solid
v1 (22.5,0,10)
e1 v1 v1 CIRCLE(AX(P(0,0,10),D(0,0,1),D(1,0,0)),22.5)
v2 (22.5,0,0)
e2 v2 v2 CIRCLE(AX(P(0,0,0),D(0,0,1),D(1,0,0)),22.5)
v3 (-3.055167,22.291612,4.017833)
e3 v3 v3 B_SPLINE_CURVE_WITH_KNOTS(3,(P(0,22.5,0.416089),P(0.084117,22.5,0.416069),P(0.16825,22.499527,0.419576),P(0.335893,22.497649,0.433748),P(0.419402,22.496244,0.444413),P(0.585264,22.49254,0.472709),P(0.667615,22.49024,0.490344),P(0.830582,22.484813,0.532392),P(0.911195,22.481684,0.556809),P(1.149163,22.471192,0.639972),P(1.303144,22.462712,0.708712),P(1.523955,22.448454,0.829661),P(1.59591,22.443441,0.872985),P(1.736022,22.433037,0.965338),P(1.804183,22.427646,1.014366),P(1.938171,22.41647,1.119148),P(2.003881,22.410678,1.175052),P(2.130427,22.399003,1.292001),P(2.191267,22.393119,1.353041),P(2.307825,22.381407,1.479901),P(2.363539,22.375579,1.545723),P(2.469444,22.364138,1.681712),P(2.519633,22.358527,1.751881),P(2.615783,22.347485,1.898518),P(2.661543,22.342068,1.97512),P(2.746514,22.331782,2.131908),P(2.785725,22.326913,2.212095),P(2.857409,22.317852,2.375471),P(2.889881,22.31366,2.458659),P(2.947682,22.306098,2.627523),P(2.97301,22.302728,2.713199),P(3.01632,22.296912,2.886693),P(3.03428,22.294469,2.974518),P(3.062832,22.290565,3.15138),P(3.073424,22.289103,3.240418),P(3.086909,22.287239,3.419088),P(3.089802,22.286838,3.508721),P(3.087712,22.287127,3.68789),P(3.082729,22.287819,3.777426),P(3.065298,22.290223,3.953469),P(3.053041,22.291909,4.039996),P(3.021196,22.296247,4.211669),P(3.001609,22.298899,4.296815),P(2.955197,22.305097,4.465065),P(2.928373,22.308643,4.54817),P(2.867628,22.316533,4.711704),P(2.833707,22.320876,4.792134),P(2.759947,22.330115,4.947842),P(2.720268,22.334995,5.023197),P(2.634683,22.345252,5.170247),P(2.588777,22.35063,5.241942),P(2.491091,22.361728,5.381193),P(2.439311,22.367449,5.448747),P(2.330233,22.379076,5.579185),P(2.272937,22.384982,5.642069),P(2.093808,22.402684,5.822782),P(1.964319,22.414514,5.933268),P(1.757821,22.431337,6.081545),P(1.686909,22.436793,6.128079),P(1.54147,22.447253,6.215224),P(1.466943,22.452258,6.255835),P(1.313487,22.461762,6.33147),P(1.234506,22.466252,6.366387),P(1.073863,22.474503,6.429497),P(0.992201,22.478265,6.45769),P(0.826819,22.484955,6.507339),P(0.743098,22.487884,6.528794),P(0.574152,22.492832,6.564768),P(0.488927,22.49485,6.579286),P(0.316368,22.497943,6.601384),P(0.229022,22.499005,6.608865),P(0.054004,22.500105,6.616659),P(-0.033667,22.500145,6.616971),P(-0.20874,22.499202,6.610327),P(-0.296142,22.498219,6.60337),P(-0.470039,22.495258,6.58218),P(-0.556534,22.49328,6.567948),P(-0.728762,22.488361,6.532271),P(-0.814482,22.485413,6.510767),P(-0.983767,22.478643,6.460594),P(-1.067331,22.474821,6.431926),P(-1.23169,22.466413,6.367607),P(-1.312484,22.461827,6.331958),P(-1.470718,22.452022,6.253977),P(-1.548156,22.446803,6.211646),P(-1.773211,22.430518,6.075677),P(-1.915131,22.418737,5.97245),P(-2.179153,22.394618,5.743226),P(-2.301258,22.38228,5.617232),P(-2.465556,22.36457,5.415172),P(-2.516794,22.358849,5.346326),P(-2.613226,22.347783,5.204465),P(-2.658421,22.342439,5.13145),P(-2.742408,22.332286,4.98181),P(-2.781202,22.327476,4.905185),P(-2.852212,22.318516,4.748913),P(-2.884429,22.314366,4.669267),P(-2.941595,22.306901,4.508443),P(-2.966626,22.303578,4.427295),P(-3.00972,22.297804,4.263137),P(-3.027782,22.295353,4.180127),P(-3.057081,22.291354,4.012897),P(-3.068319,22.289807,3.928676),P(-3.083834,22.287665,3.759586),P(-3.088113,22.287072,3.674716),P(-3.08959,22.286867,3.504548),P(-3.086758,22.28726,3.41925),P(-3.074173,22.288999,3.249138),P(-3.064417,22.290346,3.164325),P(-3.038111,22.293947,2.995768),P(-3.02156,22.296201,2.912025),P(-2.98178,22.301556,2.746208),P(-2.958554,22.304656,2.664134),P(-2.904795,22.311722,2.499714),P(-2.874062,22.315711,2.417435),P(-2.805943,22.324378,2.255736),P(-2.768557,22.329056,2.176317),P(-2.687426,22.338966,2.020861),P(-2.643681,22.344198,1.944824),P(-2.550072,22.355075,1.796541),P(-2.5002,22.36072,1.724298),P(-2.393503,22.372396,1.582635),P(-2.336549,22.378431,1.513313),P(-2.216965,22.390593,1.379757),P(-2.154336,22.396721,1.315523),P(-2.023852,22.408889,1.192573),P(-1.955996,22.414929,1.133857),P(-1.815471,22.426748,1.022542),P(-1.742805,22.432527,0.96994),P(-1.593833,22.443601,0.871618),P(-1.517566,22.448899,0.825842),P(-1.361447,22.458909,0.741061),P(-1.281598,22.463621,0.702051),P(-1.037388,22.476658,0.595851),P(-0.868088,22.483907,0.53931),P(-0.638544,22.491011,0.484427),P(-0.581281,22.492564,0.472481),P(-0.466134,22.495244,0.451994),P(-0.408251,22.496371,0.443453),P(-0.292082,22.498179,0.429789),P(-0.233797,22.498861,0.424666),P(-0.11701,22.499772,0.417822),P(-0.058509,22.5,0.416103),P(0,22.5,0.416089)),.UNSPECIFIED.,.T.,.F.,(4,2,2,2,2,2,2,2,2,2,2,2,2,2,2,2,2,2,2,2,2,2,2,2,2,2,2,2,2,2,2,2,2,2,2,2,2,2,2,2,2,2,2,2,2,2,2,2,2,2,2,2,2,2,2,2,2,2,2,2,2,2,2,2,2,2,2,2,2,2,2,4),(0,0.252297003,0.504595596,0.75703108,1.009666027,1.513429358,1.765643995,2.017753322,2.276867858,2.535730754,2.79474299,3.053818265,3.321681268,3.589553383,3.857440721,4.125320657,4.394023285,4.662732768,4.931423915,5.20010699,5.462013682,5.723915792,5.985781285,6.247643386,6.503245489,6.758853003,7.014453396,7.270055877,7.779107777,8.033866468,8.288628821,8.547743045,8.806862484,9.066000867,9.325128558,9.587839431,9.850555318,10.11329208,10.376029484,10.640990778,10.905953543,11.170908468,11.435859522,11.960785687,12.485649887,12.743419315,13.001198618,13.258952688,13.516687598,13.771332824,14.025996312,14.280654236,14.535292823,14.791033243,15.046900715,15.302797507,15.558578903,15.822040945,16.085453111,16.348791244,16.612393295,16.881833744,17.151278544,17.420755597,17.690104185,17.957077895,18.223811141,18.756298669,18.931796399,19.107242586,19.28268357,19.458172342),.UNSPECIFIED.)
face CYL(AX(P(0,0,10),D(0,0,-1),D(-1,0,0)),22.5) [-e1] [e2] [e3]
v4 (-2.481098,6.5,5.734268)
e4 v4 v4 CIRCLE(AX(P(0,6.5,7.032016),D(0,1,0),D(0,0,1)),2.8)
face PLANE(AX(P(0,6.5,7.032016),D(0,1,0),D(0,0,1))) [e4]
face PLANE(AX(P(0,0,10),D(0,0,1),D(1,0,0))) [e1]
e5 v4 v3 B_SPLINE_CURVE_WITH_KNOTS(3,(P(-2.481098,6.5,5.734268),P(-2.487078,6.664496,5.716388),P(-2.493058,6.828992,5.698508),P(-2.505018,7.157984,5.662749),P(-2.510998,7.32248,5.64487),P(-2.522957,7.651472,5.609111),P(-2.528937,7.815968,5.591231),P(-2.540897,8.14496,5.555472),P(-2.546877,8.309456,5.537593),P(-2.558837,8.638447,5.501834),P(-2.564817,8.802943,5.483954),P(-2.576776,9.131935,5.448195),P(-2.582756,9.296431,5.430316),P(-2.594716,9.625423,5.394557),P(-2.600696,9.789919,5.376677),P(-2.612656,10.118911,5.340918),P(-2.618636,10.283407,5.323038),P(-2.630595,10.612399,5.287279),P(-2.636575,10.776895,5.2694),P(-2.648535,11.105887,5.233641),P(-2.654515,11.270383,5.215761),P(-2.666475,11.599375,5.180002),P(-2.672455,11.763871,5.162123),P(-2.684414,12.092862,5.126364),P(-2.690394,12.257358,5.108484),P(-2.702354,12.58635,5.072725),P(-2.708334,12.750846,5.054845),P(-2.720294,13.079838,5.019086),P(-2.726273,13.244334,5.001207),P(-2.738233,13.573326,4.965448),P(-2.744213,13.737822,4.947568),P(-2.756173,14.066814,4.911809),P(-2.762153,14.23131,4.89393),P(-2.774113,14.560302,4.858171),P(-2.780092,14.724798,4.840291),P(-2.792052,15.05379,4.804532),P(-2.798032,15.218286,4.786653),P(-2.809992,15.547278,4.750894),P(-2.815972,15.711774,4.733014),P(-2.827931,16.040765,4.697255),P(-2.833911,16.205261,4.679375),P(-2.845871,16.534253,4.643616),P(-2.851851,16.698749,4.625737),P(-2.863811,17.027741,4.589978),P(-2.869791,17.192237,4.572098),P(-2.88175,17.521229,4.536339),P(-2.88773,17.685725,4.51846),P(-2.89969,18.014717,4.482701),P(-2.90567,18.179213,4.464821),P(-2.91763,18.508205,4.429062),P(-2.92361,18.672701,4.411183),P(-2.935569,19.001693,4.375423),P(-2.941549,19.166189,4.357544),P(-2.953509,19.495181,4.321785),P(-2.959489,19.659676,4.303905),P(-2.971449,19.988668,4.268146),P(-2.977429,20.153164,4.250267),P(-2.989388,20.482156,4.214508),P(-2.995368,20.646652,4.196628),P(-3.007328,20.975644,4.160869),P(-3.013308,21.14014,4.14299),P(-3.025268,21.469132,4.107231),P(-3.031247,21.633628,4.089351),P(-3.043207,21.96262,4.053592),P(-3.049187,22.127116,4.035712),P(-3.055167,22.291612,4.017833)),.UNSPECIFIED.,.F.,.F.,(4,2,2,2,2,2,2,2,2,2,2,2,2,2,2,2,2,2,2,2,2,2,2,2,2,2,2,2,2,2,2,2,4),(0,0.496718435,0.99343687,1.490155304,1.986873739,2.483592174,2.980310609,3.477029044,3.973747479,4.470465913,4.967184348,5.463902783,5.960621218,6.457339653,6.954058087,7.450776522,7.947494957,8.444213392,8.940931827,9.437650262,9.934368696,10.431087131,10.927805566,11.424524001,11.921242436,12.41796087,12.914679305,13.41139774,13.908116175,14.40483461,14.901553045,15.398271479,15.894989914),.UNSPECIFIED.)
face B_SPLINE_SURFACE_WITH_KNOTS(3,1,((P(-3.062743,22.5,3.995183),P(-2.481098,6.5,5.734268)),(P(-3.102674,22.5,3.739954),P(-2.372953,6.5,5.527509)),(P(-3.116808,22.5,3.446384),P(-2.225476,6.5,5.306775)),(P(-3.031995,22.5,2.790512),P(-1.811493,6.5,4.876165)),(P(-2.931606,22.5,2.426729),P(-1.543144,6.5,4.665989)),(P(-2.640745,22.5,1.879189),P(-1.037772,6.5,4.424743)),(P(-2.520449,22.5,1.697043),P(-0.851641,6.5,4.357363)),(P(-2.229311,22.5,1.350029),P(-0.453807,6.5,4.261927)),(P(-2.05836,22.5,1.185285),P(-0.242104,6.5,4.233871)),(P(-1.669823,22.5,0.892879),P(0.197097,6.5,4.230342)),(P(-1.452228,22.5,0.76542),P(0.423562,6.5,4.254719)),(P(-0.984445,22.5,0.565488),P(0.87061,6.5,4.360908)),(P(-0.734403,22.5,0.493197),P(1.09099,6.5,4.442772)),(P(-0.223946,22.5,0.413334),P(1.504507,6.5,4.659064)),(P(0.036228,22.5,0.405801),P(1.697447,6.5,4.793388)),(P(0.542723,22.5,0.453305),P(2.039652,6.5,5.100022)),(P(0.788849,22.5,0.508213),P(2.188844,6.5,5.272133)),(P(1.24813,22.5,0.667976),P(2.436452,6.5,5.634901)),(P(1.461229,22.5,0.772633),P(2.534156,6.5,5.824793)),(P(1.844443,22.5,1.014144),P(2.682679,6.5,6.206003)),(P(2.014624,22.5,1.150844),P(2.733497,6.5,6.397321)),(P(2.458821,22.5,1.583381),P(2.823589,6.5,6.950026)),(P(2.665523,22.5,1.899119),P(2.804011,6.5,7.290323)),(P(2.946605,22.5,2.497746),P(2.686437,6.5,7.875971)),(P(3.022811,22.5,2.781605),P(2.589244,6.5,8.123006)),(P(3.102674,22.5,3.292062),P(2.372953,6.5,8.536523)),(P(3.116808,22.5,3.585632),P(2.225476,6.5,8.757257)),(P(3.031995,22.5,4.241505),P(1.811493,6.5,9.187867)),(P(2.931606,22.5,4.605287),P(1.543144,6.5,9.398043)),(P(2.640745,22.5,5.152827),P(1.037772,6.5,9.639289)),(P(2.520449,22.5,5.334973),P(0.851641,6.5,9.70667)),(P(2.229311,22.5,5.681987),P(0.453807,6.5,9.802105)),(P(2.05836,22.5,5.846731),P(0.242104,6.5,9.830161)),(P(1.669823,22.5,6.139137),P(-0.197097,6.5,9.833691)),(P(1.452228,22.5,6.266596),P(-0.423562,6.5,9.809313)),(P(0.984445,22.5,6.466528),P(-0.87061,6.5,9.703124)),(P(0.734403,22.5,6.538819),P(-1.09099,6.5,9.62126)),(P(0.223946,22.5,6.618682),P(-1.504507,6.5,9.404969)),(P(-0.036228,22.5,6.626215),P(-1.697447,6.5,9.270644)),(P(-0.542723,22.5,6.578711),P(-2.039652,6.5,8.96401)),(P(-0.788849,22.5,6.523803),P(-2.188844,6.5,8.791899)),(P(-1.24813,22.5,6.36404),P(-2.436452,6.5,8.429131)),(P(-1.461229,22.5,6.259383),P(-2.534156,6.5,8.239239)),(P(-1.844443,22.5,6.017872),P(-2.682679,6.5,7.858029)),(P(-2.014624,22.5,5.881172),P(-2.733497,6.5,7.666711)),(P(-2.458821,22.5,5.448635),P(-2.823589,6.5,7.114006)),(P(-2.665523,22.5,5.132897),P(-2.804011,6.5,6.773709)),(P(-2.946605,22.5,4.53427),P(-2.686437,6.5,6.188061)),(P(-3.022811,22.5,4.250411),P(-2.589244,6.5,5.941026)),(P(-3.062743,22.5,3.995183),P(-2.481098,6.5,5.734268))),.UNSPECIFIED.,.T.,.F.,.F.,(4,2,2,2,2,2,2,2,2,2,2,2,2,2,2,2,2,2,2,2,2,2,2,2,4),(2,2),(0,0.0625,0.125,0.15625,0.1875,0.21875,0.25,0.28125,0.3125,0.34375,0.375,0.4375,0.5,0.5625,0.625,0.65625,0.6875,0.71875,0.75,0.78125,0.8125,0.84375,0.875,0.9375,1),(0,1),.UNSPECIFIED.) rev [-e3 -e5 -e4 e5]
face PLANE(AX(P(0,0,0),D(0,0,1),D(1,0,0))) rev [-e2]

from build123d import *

# Parameters (mm, degrees)
SKETCH1_R           = 22.5
BOSS_EXTRUDE1_DEPTH = 10


with BuildPart() as part:
    # Sketch1 → Boss-Extrude1 (new body)
    with BuildSketch(Plane(origin=(0, 0, 0), x_dir=(0, 1, 0), z_dir=(0, 0, 1))):
        with Locations(Location((0, 0, 0), (0, 0, 270))):
            Circle(SKETCH1_R)
    extrude(amount=BOSS_EXTRUDE1_DEPTH)

    # Cut-Loft2: read off the stored shape, not the designer's step
    # Cut-Loft2: loft between two sections, ruled curve by curve
    cut_loft2_from = [
        Edge.make_bspline([(-3.062742519, 22.5, 3.995182606), (-3.102673733, 22.5, 3.739954063), (-3.116808131, 22.5, 3.446383899), (-3.031995261, 22.5, 2.790511537), (-2.931606201, 22.5, 2.426728682), (-2.640745029, 22.5, 1.879188932), (-2.52044876, 22.5, 1.697043211), (-2.229311291, 22.5, 1.350028778), (-2.058360385, 22.5, 1.185285355), (-1.669822979, 22.5, 0.892878816), (-1.45222816, 22.5, 0.765420496), (-0.984445001, 22.5, 0.565488339), (-0.734403106, 22.5, 0.493196738), (-0.223946019, 22.5, 0.413334311), (0.036227535, 22.5, 0.405801289), (0.542722706, 22.5, 0.453304899), (0.788849216, 22.5, 0.508212731), (1.248129809, 22.5, 0.667975792), (1.461229266, 22.5, 0.772633471), (1.844443062, 22.5, 1.014143778), (2.0146236, 22.5, 1.150843597), (2.458820633, 22.5, 1.583381452), (2.665522556, 22.5, 1.899119071), (2.946605326, 22.5, 2.497746045), (3.022811306, 22.5, 2.781604937), (3.102673733, 22.5, 3.292062024), (3.116808131, 22.5, 3.585632188), (3.031995261, 22.5, 4.241504549), (2.931606201, 22.5, 4.605287404), (2.640745029, 22.5, 5.152827155), (2.52044876, 22.5, 5.334972875), (2.229311291, 22.5, 5.681987308), (2.058360385, 22.5, 5.846730732), (1.669822979, 22.5, 6.139137271), (1.45222816, 22.5, 6.266595591), (0.984445001, 22.5, 6.466527748), (0.734403106, 22.5, 6.538819349), (0.223946019, 22.5, 6.618681776), (-0.036227535, 22.5, 6.626214798), (-0.542722706, 22.5, 6.578711188), (-0.788849216, 22.5, 6.523803355), (-1.248129809, 22.5, 6.364040295), (-1.461229266, 22.5, 6.259382616), (-1.844443062, 22.5, 6.017872308), (-2.0146236, 22.5, 5.88117249), (-2.458820633, 22.5, 5.448634635), (-2.665522556, 22.5, 5.132897016), (-2.946605326, 22.5, 4.534270042), (-3.022811306, 22.5, 4.250411149), (-3.062742519, 22.5, 3.995182606)], [0, 0, 0, 0, 0.0625, 0.0625, 0.125, 0.125, 0.15625, 0.15625, 0.1875, 0.1875, 0.21875, 0.21875, 0.25, 0.25, 0.28125, 0.28125, 0.3125, 0.3125, 0.34375, 0.34375, 0.375, 0.375, 0.4375, 0.4375, 0.5, 0.5, 0.5625, 0.5625, 0.625, 0.625, 0.65625, 0.65625, 0.6875, 0.6875, 0.71875, 0.71875, 0.75, 0.75, 0.78125, 0.78125, 0.8125, 0.8125, 0.84375, 0.84375, 0.875, 0.875, 0.9375, 0.9375, 1, 1, 1, 1], 3),
    ]
    cut_loft2_to = [
        Edge.make_bspline([(-2.481098276, 6.5, 5.73426752), (-2.372952563, 6.5, 5.52750933), (-2.225476335, 6.5, 5.306774985), (-1.811493158, 6.5, 4.876164906), (-1.543143857, 6.5, 4.665988865), (-1.037772293, 6.5, 4.424742969), (-0.851641147, 6.5, 4.357362517), (-0.453807073, 6.5, 4.261926778), (-0.242104145, 6.5, 4.233871489), (0.197097356, 6.5, 4.230341545), (0.423561643, 6.5, 4.254719262), (0.870610273, 6.5, 4.360907727), (1.090990377, 6.5, 4.442772096), (1.504506757, 6.5, 4.659063524), (1.697447285, 6.5, 4.793388196), (2.039652165, 6.5, 5.100021997), (2.188844069, 6.5, 5.272132782), (2.43645178, 6.5, 5.634901084), (2.534156402, 6.5, 5.824793252), (2.682679055, 6.5, 6.206003105), (2.733497087, 6.5, 6.39732079), (2.82358911, 6.5, 6.950026342), (2.804011262, 6.5, 7.290323306), (2.686436626, 6.5, 7.875971081), (2.58924399, 6.5, 8.123006464), (2.372952563, 6.5, 8.536522843), (2.225476335, 6.5, 8.757257189), (1.811493158, 6.5, 9.187867268), (1.543143857, 6.5, 9.398043309), (1.037772293, 6.5, 9.639289205), (0.851641147, 6.5, 9.706669656), (0.453807073, 6.5, 9.802105396), (0.242104145, 6.5, 9.830160684), (-0.197097356, 6.5, 9.833690628), (-0.423561643, 6.5, 9.809312911), (-0.870610273, 6.5, 9.703124446), (-1.090990377, 6.5, 9.621260077), (-1.504506757, 6.5, 9.404968649), (-1.697447285, 6.5, 9.270643977), (-2.039652165, 6.5, 8.964010176), (-2.188844069, 6.5, 8.791899391), (-2.43645178, 6.5, 8.429131089), (-2.534156402, 6.5, 8.239238921), (-2.682679055, 6.5, 7.858029068), (-2.733497087, 6.5, 7.666711383), (-2.82358911, 6.5, 7.114005831), (-2.804011262, 6.5, 6.773708867), (-2.686436626, 6.5, 6.188061093), (-2.58924399, 6.5, 5.94102571), (-2.481098276, 6.5, 5.73426752)], [0, 0, 0, 0, 0.0625, 0.0625, 0.125, 0.125, 0.15625, 0.15625, 0.1875, 0.1875, 0.21875, 0.21875, 0.25, 0.25, 0.28125, 0.28125, 0.3125, 0.3125, 0.34375, 0.34375, 0.375, 0.375, 0.4375, 0.4375, 0.5, 0.5, 0.5625, 0.5625, 0.625, 0.625, 0.65625, 0.65625, 0.6875, 0.6875, 0.71875, 0.71875, 0.75, 0.75, 0.78125, 0.78125, 0.8125, 0.8125, 0.84375, 0.84375, 0.875, 0.875, 0.9375, 0.9375, 1, 1, 1, 1], 3),
    ]
    cut_loft2 = Solid(Shell([*[Face.make_surface_from_curves(cut_loft2_from[k], cut_loft2_to[k]) for k in range(1)], Face(Wire(cut_loft2_from)), Face(Wire(cut_loft2_to))]))
    add(cut_loft2, mode=Mode.SUBTRACT)


solid = part.part
